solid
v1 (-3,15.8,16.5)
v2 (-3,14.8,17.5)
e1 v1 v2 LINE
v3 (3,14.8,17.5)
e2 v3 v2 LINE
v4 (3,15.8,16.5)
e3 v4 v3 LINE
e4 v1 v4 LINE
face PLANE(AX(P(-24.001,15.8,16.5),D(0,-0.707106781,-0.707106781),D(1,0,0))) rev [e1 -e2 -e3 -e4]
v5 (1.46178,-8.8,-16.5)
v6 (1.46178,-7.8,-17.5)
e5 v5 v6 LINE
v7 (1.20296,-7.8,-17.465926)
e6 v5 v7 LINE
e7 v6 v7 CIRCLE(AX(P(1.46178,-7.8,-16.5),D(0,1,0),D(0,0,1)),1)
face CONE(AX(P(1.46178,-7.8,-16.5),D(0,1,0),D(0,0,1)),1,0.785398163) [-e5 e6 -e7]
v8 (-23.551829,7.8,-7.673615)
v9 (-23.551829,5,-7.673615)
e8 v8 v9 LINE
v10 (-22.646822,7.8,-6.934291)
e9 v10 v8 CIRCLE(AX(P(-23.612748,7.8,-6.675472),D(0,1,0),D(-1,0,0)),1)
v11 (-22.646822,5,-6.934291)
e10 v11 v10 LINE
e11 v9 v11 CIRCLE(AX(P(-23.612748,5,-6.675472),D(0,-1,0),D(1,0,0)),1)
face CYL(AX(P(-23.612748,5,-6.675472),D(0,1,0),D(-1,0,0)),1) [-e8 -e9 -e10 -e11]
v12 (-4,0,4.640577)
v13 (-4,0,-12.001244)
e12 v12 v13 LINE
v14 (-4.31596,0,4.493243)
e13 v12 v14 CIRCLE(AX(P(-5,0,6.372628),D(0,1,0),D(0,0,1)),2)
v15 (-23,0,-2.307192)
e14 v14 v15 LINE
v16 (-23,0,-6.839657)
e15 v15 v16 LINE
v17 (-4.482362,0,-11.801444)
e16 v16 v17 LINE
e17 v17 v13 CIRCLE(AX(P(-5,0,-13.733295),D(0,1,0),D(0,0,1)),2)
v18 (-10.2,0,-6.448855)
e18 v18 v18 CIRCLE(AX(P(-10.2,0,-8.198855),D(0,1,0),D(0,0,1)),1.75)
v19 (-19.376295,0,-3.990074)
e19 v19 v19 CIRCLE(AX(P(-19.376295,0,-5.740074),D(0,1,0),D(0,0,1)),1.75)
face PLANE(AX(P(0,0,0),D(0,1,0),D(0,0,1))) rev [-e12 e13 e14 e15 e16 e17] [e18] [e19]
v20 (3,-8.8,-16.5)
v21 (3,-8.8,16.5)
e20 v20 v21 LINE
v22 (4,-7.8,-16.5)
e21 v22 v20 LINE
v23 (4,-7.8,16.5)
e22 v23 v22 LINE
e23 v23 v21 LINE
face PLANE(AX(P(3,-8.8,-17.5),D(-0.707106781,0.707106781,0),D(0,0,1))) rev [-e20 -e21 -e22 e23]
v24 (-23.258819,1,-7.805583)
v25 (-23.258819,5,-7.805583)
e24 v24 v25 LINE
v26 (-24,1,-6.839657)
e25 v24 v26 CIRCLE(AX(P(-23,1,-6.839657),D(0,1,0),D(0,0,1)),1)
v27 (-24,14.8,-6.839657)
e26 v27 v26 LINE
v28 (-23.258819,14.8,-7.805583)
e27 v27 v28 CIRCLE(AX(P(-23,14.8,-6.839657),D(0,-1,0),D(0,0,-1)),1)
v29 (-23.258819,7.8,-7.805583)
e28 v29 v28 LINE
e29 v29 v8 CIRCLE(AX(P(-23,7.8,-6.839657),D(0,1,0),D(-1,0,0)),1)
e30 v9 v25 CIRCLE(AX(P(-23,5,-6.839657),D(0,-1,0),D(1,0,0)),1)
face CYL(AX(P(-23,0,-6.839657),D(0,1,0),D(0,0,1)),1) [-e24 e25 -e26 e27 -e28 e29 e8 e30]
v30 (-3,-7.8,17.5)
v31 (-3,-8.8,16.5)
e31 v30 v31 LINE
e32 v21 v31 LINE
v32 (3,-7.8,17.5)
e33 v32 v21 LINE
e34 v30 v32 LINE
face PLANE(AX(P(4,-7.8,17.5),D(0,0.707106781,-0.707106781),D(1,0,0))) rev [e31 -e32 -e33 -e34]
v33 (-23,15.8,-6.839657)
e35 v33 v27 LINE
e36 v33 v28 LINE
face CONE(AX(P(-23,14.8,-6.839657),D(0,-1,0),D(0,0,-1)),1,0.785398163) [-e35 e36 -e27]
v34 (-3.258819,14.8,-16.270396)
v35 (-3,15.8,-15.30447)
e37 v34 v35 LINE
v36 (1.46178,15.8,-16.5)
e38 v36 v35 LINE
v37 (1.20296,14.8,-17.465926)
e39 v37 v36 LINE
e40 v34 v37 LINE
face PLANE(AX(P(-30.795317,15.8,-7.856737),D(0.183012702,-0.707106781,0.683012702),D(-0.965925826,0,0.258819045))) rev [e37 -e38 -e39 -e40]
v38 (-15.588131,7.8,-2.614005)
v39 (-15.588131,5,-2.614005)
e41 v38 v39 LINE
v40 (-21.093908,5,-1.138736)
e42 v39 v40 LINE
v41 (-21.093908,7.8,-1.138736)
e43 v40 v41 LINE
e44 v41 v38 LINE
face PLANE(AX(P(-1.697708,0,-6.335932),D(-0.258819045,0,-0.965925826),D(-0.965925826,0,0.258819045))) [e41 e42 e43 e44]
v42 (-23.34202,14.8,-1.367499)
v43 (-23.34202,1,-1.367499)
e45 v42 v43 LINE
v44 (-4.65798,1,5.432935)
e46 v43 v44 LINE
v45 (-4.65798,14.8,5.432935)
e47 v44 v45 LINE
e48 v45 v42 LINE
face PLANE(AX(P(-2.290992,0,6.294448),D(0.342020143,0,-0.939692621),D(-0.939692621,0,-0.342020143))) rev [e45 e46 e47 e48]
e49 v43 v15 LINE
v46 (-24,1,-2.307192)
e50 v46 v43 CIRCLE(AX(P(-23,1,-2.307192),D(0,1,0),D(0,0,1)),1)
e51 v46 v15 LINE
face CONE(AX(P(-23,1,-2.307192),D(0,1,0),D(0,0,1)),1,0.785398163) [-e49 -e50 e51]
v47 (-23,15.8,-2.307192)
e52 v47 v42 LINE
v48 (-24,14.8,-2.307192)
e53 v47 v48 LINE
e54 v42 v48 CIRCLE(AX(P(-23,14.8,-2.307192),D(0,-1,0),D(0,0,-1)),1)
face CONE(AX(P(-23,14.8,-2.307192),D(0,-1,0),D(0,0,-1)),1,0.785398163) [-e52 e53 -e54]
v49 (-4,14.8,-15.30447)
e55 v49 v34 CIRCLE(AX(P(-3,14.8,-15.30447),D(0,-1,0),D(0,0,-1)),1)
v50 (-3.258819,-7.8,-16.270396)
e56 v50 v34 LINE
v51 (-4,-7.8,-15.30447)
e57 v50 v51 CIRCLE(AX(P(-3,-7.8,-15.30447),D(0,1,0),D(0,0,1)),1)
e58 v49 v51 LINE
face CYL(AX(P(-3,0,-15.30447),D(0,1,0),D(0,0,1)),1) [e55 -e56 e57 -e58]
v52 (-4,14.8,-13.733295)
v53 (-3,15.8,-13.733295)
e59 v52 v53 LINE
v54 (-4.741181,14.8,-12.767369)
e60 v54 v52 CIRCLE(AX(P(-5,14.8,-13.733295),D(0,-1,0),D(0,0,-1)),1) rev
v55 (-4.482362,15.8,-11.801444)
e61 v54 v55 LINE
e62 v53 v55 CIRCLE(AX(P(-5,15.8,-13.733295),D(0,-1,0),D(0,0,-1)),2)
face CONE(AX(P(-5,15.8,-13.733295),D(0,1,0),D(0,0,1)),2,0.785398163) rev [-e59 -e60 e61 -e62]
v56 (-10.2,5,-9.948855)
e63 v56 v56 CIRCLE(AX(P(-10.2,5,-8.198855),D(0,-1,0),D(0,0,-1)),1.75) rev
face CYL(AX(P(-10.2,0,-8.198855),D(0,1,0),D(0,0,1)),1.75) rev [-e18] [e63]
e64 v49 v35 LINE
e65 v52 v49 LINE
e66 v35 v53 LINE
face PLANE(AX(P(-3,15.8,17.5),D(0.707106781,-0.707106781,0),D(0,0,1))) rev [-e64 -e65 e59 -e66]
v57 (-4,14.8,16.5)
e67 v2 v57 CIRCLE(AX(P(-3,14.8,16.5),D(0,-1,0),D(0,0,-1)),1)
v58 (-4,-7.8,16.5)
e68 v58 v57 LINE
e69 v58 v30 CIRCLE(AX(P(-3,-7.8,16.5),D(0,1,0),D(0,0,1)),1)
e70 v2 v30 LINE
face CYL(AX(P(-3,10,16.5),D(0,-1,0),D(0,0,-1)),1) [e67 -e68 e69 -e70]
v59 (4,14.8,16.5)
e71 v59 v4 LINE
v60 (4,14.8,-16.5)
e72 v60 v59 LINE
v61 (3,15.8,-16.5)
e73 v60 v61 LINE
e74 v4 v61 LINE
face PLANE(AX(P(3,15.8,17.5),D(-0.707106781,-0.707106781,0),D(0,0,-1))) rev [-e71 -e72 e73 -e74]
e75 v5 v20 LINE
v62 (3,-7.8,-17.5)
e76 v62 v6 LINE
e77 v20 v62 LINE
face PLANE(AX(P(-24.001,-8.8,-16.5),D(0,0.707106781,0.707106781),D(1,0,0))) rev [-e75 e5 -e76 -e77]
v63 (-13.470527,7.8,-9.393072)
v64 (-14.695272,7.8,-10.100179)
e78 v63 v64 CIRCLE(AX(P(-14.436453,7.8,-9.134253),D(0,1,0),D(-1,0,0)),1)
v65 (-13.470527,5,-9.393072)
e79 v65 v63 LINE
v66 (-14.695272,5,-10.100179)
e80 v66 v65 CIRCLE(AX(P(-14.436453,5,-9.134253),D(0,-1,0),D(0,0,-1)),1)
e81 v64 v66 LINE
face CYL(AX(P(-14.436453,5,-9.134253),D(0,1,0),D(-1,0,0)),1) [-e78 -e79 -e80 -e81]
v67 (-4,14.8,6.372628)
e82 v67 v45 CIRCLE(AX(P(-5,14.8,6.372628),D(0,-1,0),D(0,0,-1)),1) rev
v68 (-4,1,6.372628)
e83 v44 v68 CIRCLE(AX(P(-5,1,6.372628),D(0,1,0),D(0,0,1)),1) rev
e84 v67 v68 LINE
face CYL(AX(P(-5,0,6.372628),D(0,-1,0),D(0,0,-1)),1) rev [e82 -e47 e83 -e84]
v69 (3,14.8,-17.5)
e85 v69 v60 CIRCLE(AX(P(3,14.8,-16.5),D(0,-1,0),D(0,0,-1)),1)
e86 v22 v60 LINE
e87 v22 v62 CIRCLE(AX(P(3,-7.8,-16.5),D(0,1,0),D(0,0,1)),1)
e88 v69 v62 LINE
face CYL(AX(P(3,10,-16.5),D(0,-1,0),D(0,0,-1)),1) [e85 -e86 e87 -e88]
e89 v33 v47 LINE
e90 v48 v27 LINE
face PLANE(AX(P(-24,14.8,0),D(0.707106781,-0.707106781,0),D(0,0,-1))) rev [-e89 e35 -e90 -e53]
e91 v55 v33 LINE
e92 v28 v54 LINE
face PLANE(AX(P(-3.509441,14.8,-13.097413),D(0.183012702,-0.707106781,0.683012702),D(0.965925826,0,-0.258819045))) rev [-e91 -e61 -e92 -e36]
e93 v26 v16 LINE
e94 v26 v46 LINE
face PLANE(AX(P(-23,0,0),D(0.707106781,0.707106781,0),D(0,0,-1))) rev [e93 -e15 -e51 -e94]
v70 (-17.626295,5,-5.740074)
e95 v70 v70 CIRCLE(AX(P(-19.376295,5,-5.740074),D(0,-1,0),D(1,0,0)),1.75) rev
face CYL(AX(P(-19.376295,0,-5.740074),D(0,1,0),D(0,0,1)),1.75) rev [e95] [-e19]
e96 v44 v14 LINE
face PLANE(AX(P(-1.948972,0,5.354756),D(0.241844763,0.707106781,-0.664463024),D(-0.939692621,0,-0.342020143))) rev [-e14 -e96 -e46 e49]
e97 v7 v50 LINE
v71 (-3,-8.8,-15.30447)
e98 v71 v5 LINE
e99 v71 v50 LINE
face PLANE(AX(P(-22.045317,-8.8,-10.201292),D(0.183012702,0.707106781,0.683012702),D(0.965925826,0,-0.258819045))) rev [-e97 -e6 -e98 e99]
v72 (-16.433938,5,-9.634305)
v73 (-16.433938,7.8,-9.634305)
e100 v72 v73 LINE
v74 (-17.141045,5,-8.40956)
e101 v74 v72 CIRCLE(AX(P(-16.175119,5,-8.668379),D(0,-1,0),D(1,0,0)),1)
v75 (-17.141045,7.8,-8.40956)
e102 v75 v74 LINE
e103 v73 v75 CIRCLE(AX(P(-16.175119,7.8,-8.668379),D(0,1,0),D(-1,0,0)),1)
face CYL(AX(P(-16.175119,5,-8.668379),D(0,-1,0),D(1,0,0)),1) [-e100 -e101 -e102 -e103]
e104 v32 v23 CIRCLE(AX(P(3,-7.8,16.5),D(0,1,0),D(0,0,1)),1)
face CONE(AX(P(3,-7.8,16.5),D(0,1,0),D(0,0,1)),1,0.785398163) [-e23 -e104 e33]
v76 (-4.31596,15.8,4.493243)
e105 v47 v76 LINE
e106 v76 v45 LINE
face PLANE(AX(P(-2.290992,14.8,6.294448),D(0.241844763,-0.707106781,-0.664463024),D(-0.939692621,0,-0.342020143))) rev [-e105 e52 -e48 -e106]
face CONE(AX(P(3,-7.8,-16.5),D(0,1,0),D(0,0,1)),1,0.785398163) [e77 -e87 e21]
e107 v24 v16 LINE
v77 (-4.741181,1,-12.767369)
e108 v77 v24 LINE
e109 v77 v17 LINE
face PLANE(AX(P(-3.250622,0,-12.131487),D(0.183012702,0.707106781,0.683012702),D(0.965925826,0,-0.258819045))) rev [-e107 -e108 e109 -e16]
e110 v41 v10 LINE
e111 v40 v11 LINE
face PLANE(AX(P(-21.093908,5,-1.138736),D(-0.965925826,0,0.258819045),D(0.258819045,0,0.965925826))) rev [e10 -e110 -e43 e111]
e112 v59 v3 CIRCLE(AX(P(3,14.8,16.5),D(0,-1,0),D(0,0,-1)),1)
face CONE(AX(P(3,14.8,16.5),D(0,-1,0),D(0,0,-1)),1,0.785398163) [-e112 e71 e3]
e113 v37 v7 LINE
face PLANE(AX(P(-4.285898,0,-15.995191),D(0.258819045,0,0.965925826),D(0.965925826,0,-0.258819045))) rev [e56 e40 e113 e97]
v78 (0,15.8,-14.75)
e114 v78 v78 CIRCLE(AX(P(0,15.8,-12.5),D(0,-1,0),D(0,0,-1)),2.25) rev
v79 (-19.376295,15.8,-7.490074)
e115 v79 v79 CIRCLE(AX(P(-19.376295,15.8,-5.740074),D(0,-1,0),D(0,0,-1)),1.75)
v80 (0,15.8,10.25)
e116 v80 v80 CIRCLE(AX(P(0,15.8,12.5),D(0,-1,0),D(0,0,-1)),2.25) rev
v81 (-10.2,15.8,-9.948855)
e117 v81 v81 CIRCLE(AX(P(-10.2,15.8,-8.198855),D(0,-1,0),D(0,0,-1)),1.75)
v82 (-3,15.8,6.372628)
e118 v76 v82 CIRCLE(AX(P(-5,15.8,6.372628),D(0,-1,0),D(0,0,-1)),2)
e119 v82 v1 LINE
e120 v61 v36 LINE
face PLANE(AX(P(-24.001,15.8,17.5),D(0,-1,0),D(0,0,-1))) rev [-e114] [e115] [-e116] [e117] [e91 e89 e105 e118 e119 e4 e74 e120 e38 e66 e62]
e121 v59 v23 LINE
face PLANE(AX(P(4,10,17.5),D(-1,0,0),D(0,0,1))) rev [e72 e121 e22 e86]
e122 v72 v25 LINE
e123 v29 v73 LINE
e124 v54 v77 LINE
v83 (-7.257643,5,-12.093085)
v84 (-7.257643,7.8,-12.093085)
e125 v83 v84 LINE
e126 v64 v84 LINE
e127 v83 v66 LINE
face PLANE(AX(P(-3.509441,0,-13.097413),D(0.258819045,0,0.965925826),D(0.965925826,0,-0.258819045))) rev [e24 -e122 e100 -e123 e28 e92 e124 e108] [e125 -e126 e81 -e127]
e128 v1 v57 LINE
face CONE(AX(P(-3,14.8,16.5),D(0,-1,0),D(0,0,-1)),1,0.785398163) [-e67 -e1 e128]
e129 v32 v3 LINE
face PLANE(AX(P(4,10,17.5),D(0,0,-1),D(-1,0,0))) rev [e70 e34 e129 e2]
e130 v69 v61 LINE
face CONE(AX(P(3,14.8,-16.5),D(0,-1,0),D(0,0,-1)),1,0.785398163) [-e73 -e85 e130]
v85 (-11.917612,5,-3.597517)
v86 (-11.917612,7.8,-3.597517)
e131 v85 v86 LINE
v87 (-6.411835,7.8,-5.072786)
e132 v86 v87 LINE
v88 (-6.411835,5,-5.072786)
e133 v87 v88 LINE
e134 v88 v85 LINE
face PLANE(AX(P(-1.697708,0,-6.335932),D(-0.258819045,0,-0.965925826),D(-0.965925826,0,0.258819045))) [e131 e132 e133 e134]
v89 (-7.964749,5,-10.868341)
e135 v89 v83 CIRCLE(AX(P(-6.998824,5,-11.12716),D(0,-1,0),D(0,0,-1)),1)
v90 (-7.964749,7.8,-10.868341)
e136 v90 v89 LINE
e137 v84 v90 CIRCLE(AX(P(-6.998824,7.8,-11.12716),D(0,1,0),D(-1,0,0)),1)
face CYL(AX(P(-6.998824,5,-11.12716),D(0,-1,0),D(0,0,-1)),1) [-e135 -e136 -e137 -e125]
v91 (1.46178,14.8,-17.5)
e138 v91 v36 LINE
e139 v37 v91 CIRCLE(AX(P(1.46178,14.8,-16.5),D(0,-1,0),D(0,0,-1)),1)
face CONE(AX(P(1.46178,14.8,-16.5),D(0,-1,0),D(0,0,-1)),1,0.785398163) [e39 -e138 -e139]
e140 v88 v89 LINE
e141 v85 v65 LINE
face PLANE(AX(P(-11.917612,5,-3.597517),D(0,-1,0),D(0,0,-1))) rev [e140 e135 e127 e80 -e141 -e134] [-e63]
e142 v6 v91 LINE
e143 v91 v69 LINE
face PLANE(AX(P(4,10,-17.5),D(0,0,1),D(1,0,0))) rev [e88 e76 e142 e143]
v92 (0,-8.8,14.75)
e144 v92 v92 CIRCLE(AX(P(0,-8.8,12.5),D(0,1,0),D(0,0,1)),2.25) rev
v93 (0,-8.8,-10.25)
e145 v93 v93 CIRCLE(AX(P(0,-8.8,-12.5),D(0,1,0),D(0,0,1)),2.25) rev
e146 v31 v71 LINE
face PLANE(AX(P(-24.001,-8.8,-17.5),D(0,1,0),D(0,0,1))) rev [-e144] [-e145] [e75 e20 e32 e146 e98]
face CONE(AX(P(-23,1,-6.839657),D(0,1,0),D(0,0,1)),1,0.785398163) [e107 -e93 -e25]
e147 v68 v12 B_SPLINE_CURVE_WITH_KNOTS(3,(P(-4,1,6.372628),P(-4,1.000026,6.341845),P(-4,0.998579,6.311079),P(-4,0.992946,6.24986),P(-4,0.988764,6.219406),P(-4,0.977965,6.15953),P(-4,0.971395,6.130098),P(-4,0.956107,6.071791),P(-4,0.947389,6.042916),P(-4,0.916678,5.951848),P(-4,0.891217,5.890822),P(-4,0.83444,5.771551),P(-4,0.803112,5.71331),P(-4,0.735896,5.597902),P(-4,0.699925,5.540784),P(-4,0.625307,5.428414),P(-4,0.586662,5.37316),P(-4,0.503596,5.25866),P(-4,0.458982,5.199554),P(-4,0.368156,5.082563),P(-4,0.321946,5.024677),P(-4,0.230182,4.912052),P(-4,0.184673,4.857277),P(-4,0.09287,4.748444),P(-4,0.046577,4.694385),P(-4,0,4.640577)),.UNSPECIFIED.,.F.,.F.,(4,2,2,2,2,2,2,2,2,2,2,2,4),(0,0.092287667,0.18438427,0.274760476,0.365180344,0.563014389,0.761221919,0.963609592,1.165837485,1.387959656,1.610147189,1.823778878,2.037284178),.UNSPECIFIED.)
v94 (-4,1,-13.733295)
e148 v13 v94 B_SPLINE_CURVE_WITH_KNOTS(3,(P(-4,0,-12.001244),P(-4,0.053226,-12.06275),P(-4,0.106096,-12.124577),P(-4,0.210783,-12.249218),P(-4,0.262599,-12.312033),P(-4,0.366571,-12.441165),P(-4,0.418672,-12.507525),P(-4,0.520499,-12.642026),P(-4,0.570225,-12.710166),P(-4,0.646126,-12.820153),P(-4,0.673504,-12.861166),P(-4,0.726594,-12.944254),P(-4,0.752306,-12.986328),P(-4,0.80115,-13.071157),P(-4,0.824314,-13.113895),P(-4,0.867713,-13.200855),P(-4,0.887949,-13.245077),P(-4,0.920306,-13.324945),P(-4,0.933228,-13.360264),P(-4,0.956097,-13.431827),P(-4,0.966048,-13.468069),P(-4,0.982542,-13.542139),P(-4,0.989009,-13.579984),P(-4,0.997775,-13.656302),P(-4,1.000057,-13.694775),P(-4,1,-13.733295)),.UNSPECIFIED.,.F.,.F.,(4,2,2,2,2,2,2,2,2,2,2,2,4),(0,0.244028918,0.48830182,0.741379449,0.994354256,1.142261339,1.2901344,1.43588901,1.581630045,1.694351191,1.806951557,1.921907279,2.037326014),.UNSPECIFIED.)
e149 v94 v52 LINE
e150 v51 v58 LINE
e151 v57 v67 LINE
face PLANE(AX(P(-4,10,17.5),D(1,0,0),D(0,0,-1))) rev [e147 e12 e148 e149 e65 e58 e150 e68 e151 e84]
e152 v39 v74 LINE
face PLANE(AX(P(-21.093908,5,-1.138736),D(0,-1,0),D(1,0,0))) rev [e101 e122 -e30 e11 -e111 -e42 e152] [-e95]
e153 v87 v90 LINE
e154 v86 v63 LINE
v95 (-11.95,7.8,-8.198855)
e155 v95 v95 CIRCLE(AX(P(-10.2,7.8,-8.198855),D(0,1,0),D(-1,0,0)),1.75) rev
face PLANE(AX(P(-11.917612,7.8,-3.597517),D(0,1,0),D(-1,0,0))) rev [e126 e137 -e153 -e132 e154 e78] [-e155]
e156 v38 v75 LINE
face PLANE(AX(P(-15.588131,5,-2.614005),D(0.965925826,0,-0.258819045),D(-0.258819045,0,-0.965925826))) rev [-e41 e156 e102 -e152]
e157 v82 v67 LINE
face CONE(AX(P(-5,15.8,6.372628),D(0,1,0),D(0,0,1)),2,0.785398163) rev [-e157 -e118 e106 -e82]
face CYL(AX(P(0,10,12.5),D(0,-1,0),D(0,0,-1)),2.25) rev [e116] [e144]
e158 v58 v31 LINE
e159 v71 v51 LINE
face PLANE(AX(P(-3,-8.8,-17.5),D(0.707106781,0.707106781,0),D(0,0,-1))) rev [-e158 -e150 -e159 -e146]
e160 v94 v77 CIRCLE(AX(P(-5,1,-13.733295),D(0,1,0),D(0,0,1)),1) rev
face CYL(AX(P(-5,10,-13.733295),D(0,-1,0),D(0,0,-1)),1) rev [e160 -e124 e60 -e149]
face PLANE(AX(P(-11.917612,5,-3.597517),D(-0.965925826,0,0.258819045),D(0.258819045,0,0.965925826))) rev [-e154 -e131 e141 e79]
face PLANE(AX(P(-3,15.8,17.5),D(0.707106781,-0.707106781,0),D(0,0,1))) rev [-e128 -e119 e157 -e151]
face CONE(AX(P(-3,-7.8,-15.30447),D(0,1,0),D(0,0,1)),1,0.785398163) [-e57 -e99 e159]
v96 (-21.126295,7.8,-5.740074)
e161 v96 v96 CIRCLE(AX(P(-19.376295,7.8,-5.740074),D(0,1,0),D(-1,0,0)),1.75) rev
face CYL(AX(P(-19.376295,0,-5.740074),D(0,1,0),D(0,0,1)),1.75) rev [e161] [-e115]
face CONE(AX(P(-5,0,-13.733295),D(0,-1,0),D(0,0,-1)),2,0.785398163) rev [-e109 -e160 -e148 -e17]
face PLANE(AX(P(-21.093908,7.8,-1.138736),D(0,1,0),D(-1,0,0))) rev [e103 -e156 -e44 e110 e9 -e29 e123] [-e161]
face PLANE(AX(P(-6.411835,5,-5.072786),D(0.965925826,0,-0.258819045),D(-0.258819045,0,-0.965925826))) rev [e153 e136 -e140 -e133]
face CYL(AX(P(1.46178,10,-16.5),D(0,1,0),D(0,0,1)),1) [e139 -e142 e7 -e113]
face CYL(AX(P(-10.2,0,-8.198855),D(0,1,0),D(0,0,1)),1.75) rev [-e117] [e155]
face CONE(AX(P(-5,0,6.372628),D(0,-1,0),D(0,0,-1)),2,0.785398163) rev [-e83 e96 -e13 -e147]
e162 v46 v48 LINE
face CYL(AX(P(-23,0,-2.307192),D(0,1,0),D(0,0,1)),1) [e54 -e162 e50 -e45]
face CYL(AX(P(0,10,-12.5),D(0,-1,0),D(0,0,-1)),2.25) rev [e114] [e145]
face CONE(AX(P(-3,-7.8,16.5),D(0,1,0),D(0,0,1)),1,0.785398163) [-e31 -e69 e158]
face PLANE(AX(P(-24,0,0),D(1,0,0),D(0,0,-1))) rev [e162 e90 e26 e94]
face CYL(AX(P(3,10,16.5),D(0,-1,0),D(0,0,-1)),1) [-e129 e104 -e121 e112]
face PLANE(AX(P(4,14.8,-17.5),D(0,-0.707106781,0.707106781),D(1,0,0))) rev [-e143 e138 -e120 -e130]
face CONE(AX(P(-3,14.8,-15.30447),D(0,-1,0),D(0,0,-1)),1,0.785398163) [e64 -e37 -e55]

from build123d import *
from build123d.topology import SkipClean

# Parameters (mm, degrees)
SKETCH1_W              = 8
SKETCH1_H              = 35
SKETCH1_R              = 2.25
BOSS_EXTRUDE1_DEPTH    = 10
SKETCH2_R              = 1.75
BOSS_EXTRUDE2_DEPTH    = 10
CUT_EXTRUDE1_DEPTH     = 10
SKETCH3_R              = 2.25
BOSS_EXTRUDE3_DEPTH    = 6
BOSS_EXTRUDE5_START    = 9
SKETCH5_R              = 2.25
BOSS_EXTRUDE5_DEPTH    = 9
CUT_EXTRUDE2_START     = -8
CUT_EXTRUDE2_OUTLINE_W = 35
CUT_EXTRUDE2_OUTLINE_H = 0.2
CUT_EXTRUDE2_DEPTH     = 8
BOSS_EXTRUDE6_START    = 5.8
SKETCH8_R              = 1.75
BOSS_EXTRUDE6_DEPTH    = 5.8
SKETCH9_W              = 5.7
SKETCH9_H              = 2.8
CUT_EXTRUDE3_DEPTH     = 7
FILLET1_R              = 1
FILLET2_R              = 1
CHAMFER1_SIZE          = 1
CHAMFER2_SIZE          = 1


# Read off the part's stored shape, not the designer's step: Cut-Extrude2
# Some blends are built 0.0001 mm under size
with BuildPart() as part:
    # Sketch1 → Boss-Extrude1 (new body)
    with BuildSketch(Plane(origin=(0, 0, 0), x_dir=(1, 0, 0), z_dir=(0, 1, 0))):
        Rectangle(SKETCH1_W, SKETCH1_H)
        with Locations(Location((0, 12.5, 0), (0, 0, 270))):
            Circle(SKETCH1_R, mode=Mode.SUBTRACT)
        with Locations(Location((0, -12.5, 0), (0, 0, 270))):
            Circle(SKETCH1_R, mode=Mode.SUBTRACT)
    extrude(amount=BOSS_EXTRUDE1_DEPTH)

    # Sketch2 → Boss-Extrude2 (add, through all)
    with BuildSketch(Plane(origin=(0, 10, 0), x_dir=(1, 0, 0), z_dir=(0, 1, 0))):
        Polygon((-24, 1.60698438), (-4, -5.672420305), (-4, 12.965968228), (-24, 7.60698438), align=None)
        with Locations(Location((-19.37629535, 5.740073766, 0), (0, 0, 270))):
            Circle(SKETCH2_R, mode=Mode.SUBTRACT)
        with Locations(Location((-10.2, 8.198854694, 0), (0, 0, 270))):
            Circle(SKETCH2_R, mode=Mode.SUBTRACT)
    extrude(amount=-BOSS_EXTRUDE2_DEPTH)

    # Sketch2<3> → Cut-Extrude1 (cut)
    with BuildSketch(Plane(origin=(0, 10, 0), x_dir=(1, 0, 0), z_dir=(0, 1, 0))):
        Polygon((-4, 17.5), (-4, 16.07179677), (1.330127019, 17.5), align=None)
    extrude(amount=-CUT_EXTRUDE1_DEPTH, mode=Mode.SUBTRACT)

    # Sketch3 → Boss-Extrude3 (add)
    with BuildSketch(Plane(origin=(0, 10, 0), x_dir=(1, 0, 0), z_dir=(0, 1, 0))):
        Polygon((-4, 16.07179677), (-4, -17.5), (4, -17.5), (4, 17.5), (1.330127019, 17.5), align=None)
        with Locations(Location((0, -12.5, 0), (0, 0, 270))):
            Circle(SKETCH3_R, mode=Mode.SUBTRACT)
        with Locations(Location((0, 12.5, 0), (0, 0, 270))):
            Circle(SKETCH3_R, mode=Mode.SUBTRACT)
    extrude(amount=BOSS_EXTRUDE3_DEPTH)

    # Sketch5 → Boss-Extrude5 (add)
    with SkipClean():  # the faces are left unmerged after this step: merging them gives an invalid solid
        with BuildSketch(Plane.XZ.offset(BOSS_EXTRUDE5_START)):
            Polygon((-4, 17.5), (-4, -16.07179677), (1.330127019, -17.5), (4, -17.5), (4, 17.5), align=None)
            with Locations(Location((0, -12.5, 0), (0, 0, 270))):
                Circle(SKETCH5_R, mode=Mode.SUBTRACT)
            with Locations(Location((0, 12.5, 0), (0, 0, 270))):
                Circle(SKETCH5_R, mode=Mode.SUBTRACT)
        extrude(amount=-BOSS_EXTRUDE5_DEPTH)

    # Cut-Extrude2 outline → Cut-Extrude2 (cut)
    with SkipClean():  # the faces are left unmerged after this step: merging them gives an invalid solid
        with BuildSketch(Plane(origin=(4, 0, 0), x_dir=(0, 0, -1), z_dir=(1, 0, 0)).offset(CUT_EXTRUDE2_START)):
            with Locations((0, 15.9)):
                Rectangle(CUT_EXTRUDE2_OUTLINE_W, CUT_EXTRUDE2_OUTLINE_H)
            with Locations((0, -8.9)):
                Rectangle(CUT_EXTRUDE2_OUTLINE_W, CUT_EXTRUDE2_OUTLINE_H)
        extrude(amount=CUT_EXTRUDE2_DEPTH, mode=Mode.SUBTRACT)

    # Sketch8 → Boss-Extrude6 (add)
    with SkipClean():  # the faces are left unmerged after this step: merging them gives an invalid solid
        with BuildSketch(Plane(origin=(0, 10, 0), x_dir=(1, 0, 0), z_dir=(0, 1, 0)).offset(BOSS_EXTRUDE6_START)):
            Polygon((-4, -5.672420305), (-4, 12.965968228), (-24, 7.60698438), (-24, 1.60698438), align=None)
            with Locations(Location((-10.2, 8.198854694, 0), (0, 0, 270))):
                Circle(SKETCH8_R, mode=Mode.SUBTRACT)
            with Locations(Location((-19.37629535, 5.740073766, 0), (0, 0, 270))):
                Circle(SKETCH8_R, mode=Mode.SUBTRACT)
        extrude(amount=-BOSS_EXTRUDE6_DEPTH)

    # Sketch9 → Cut-Extrude3 (cut)
    with SkipClean():  # the faces are left unmerged after this step: merging them gives an invalid solid
        with BuildSketch(Plane(origin=(-3.50944125, 0, -13.09741305), x_dir=(-0.9659258262890672, 0, 0.25881904510252496), z_dir=(-0.25881904510252496, 0, -0.9659258262890672))):
            with Locations((7.730423685, 6.4)):
                Rectangle(SKETCH9_W, SKETCH9_H)
            with Locations((17.230423685, 6.4)):
                Rectangle(SKETCH9_W, SKETCH9_H)
        extrude(amount=-CUT_EXTRUDE3_DEPTH, mode=Mode.SUBTRACT)

    # Fillet1
    # the kernel refuses this fillet: 1 mm, written as the material it adds along each edge
    with BuildSketch(Plane(origin=(-4, 10, -12.965968228), x_dir=(0, 0, -1), z_dir=(0, -1, 0))) as fillet1_piece_1:
        with BuildLine():
            CenterArc((FILLET1_R * 0.767326987979, -FILLET1_R), FILLET1_R, 90, 75)
            Line((-FILLET1_R * 0.19859883831, -FILLET1_R * 0.741180954897), (0, 0))
            Line((0, 0), (FILLET1_R * 0.767326987979, 0))
        make_face()
    extrude(amount=10)
    with BuildSketch(Plane(origin=(-4, 10, 5.672420305), x_dir=(0, 0, 1), z_dir=(0, -1, 0))) as fillet1_piece_2:
        with BuildLine():
            CenterArc((FILLET1_R * 0.70020753821, FILLET1_R), FILLET1_R, 200, 70)
            Line((-FILLET1_R * 0.239485082576, FILLET1_R * 0.657979856674), (0, 0))
            Line((0, 0), (FILLET1_R * 0.70020753821, 0))
        make_face()
    extrude(amount=10)
    with BuildSketch(Plane(origin=(-4, 15.8, 5.672420305), x_dir=(0, 0, 1), z_dir=(0, -1, 0))) as fillet1_piece_3:
        with BuildLine():
            CenterArc((FILLET1_R * 0.70020753821, FILLET1_R), FILLET1_R, 200, 70)
            Line((-FILLET1_R * 0.239485082576, FILLET1_R * 0.657979856674), (0, 0))
            Line((0, 0), (FILLET1_R * 0.70020753821, 0))
        make_face()
    extrude(amount=5.8)
    with BuildSketch(Plane(origin=(-4, 15.8, -12.965968228), x_dir=(0, 0, -1), z_dir=(0, -1, 0))) as fillet1_piece_4:
        with BuildLine():
            CenterArc((FILLET1_R * 0.767326987979, -FILLET1_R), FILLET1_R, 90, 75)
            Line((-FILLET1_R * 0.19859883831, -FILLET1_R * 0.741180954897), (0, 0))
            Line((0, 0), (FILLET1_R * 0.767326987979, 0))
        make_face()
    extrude(amount=5.8)
    # the kernel refuses this fillet: 1 mm, written as the material it takes off along each edge
    with BuildSketch(Plane(origin=(4, 0, -17.5), x_dir=(0, 0, 1), z_dir=(0, 1, 0)), Plane(origin=(4, 0, 17.5), x_dir=(-1, 0, 0), z_dir=(0, 1, 0)), Plane(origin=(-4, 18.3, 17.5), x_dir=(1, 0, 0), z_dir=(0, -1, 0))) as fillet1_2_piece_1:
        with BuildLine():
            CenterArc((FILLET1_R, -FILLET1_R), FILLET1_R, 90, 90)
            Line((0, -FILLET1_R), (0, 0))
            Line((0, 0), (FILLET1_R, 0))
        make_face()
    extrude(amount=18.3, mode=Mode.SUBTRACT)
    with BuildSketch(Plane(origin=(-8.22356853, 5, -11.834266452), x_dir=(0.965925826289069, 0, -0.2588190451025184), z_dir=(0, 1, 0)), Plane(origin=(-13.72934574, 7.8, -10.358997895), x_dir=(-0.9659258262890653, 1.2688263138573222e-15, 0.2588190451025321), z_dir=(0, -1, 0)), Plane(origin=(-17.39986388, 5, -9.375485523), x_dir=(0.9659258262890693, 1.90323947078598e-15, -0.2588190451025172), z_dir=(0, 1, 0))) as fillet1_2_piece_2:
        with BuildLine():
            CenterArc((FILLET1_R, -FILLET1_R), FILLET1_R, 90, 90)
            Line((0, -FILLET1_R), (0, 0))
            Line((0, 0), (FILLET1_R, 0))
        make_face()
    extrude(amount=2.8, mode=Mode.SUBTRACT)
    with BuildSketch(Plane(origin=(-24, 10, -7.60698438), x_dir=(0.9659258262890668, 0, -0.2588190451025261), z_dir=(0, -1, 0))) as fillet1_2_piece_3:
        with BuildLine():
            CenterArc((FILLET1_R * 0.767326987979, FILLET1_R), FILLET1_R, 195, 75)
            Line((-FILLET1_R * 0.19859883831, FILLET1_R * 0.741180954897), (0, 0))
            Line((0, 0), (FILLET1_R * 0.767326987979, 0))
        make_face()
    extrude(amount=11.91831747, mode=Mode.SUBTRACT)
    with BuildSketch(Plane(origin=(-24, 10, -1.60698438), x_dir=(0.939692620785907, 0, 0.34202014332567215), z_dir=(0, -1, 0))) as fillet1_2_piece_4:
        with BuildLine():
            CenterArc((FILLET1_R * 0.70020753821, -FILLET1_R), FILLET1_R, 90, 70)
            Line((-FILLET1_R * 0.239485082576, -FILLET1_R * 0.657979856674), (0, 0))
            Line((0, 0), (FILLET1_R * 0.70020753821, 0))
        make_face()
    extrude(amount=11.750518846, mode=Mode.SUBTRACT)
    with BuildSketch(Plane(origin=(-4, 17.71831747, -16.07179677), x_dir=(0, 0, 1), z_dir=(0, -1, 0))) as fillet1_2_piece_5:
        with BuildLine():
            CenterArc((FILLET1_R * 0.767326987979, -FILLET1_R), FILLET1_R, 90, 75)
            Line((-FILLET1_R * 0.19859883831, -FILLET1_R * 0.741180954897), (0, 0))
            Line((0, 0), (FILLET1_R * 0.767326987979, 0))
        make_face()
    extrude(amount=17.71831747, mode=Mode.SUBTRACT)
    with BuildSketch(Plane(origin=(1.330127019, 0, -17.5), x_dir=(-0.9659258262890651, 0, 0.25881904510253334), z_dir=(0, 1, 0))) as fillet1_2_piece_6:
        with BuildLine():
            CenterArc((FILLET1_R * 0.131652497587, FILLET1_R), FILLET1_R, 255, 15)
            Line((-FILLET1_R * 0.127166547515, FILLET1_R * 0.0340741737109), (0, 0))
            Line((0, 0), (FILLET1_R * 0.131652497587, 0))
        make_face()
    extrude(amount=16.129131244, mode=Mode.SUBTRACT)
    with BuildSketch(Plane(origin=(1.330127019, -9.129131244, -17.5), x_dir=(-0.9659258262890651, 0, 0.25881904510253334), z_dir=(0, 1, 0))) as fillet1_2_piece_7:
        with BuildLine():
            CenterArc((FILLET1_R * 0.131652497587, FILLET1_R), FILLET1_R, 255, 15)
            Line((-FILLET1_R * 0.127166547515, FILLET1_R * 0.0340741737109), (0, 0))
            Line((0, 0), (FILLET1_R * 0.131652497587, 0))
        make_face()
    extrude(amount=9.129131244, mode=Mode.SUBTRACT)
    with BuildSketch(Plane(origin=(-4, -10.71831747, -16.07179677), x_dir=(0, 0, 1), z_dir=(0, 1, 0))) as fillet1_2_piece_8:
        with BuildLine():
            CenterArc((FILLET1_R * 0.767326987979, FILLET1_R), FILLET1_R, 195, 75)
            Line((-FILLET1_R * 0.19859883831, FILLET1_R * 0.741180954897), (0, 0))
            Line((0, 0), (FILLET1_R * 0.767326987979, 0))
        make_face()
    extrude(amount=10.71831747, mode=Mode.SUBTRACT)
    with BuildSketch(Plane(origin=(-24, 17.550518846, -1.60698438), x_dir=(0.939692620785907, 0, 0.34202014332567243), z_dir=(0, -1, 0))) as fillet1_2_piece_9:
        with BuildLine():
            CenterArc((FILLET1_R * 0.70020753821, -FILLET1_R), FILLET1_R, 90, 70)
            Line((-FILLET1_R * 0.239485082576, -FILLET1_R * 0.657979856674), (0, 0))
            Line((0, 0), (FILLET1_R * 0.70020753821, 0))
        make_face()
    extrude(amount=7.550518846, mode=Mode.SUBTRACT)
    with BuildSketch(Plane(origin=(-24, 17.71831747, -7.60698438), x_dir=(0.9659258262890671, 0, -0.2588190451025252), z_dir=(0, -1, 0))) as fillet1_2_piece_10:
        with BuildLine():
            CenterArc((FILLET1_R * 0.767326987979, FILLET1_R), FILLET1_R, 195, 75)
            Line((-FILLET1_R * 0.19859883831, FILLET1_R * 0.741180954897), (0, 0))
            Line((0, 0), (FILLET1_R * 0.767326987979, 0))
        make_face()
    extrude(amount=7.71831747, mode=Mode.SUBTRACT)
    with BuildSketch(Plane(origin=(-4, -11.3, 17.5), x_dir=(1, 0, 0), z_dir=(0, 1, 0))) as fillet1_2_piece_11:
        with BuildLine():
            CenterArc((FILLET1_R, FILLET1_R), FILLET1_R, 180, 90)
            Line((0, FILLET1_R), (0, 0))
            Line((0, 0), (FILLET1_R, 0))
        make_face()
    extrude(amount=11.3, mode=Mode.SUBTRACT)
    with BuildSketch(Plane(origin=(4, -11.3, 17.5), x_dir=(-1, 0, 0), z_dir=(0, 1, 0)), Plane(origin=(4, -11.3, -17.5), x_dir=(0, 0, 1), z_dir=(0, 1, 0))) as fillet1_2_piece_12:
        with BuildLine():
            CenterArc((FILLET1_R, -FILLET1_R), FILLET1_R, 90, 90)
            Line((0, -FILLET1_R), (0, 0))
            Line((0, 0), (FILLET1_R, 0))
        make_face()
    extrude(amount=11.3, mode=Mode.SUBTRACT)

    # Fillet2
    # the kernel refuses this fillet: 1 mm, written as the material it takes off along each edge
    with BuildSketch(Plane(origin=(-22.90564109, 7.8, -7.900216966), x_dir=(0.25881904510252646, 0, 0.9659258262890668), z_dir=(0, -1, 0))) as fillet2_piece_1:
        with BuildLine():
            CenterArc((FILLET2_R, FILLET2_R), FILLET2_R, 180, 90)
            Line((0, FILLET2_R), (0, 0))
            Line((0, 0), (FILLET2_R, 0))
        make_face()
    extrude(amount=2.8, mode=Mode.SUBTRACT)

    # Chamfer1
    chamfer1_edges = [part.edges().sort_by_distance(p)[0] for p in [
        (-14, 15.8, -10.286476304),
        (-4, 15.8, -14.518882499),
        (-24, 15.8, -4.573424655),
        (-14, 15.8, 2.032717963),
        (-4, 15.8, 11.436313922),
        (0, 15.8, 17.5),
        (4, 15.8, 0),
        (2.230889758, 15.8, -17.5),
        (-1.027929287, 15.8, -16.868160717),
        (-3.79335334, 15.8, -15.913231211),
        (1.331253324, 15.8, -17.491444861),
        (3.707106781, 15.8, -17.207106781),
        (3.707106781, 15.8, 17.207106781),
        (-3.707106781, 15.8, 17.207106781),
        (-23.819152044, 15.8, -1.733615482),
        (-23.79335334, 15.8, -7.448418821),
        (-4.180847956, 15.8, 5.799051407),
        (-4.20664666, 15.8, -13.124533787),
    ]]
    chamfer(chamfer1_edges, length=CHAMFER1_SIZE - 0.0001)  # a hair under: the kernel refuses the full size

    # Chamfer2
    chamfer2_edges = [part.edges().sort_by_distance(p)[0] for p in [
        (-4.20664666, 0, -13.124533787),
        (-23.819152044, 0, -1.733615482),
        (-24, 0, -4.573424655),
        (-23.79335334, 0, -7.448418821),
        (-14, 0, -10.286476304),
        (-4.180847956, 0, 5.799051407),
        (-14, 0, 2.032717963),
    ]]
    chamfer(chamfer2_edges, length=CHAMFER2_SIZE - 0.0001)  # a hair under: the kernel refuses the full size
    chamfer2_2_edges = [part.edges().sort_by_distance(p)[0] for p in [
        (-4, -8.8, 0.597765109),
        (-3.707106781, -8.8, 17.207106781),
        (-1.027929287, -8.8, -16.868160717),
        (-3.79335334, -8.8, -15.913231211),
        (0, -8.8, 17.5),
        (3.707106781, -8.8, 17.207106781),
        (4, -8.8, 0),
        (3.707106781, -8.8, -17.207106781),
        (2.230889758, -8.8, -17.5),
        (1.331253324, -8.8, -17.491444861),
    ]]
    chamfer(chamfer2_2_edges, length=CHAMFER2_SIZE - 0.0001)  # a hair under: the kernel refuses the full size


solid = part.part
